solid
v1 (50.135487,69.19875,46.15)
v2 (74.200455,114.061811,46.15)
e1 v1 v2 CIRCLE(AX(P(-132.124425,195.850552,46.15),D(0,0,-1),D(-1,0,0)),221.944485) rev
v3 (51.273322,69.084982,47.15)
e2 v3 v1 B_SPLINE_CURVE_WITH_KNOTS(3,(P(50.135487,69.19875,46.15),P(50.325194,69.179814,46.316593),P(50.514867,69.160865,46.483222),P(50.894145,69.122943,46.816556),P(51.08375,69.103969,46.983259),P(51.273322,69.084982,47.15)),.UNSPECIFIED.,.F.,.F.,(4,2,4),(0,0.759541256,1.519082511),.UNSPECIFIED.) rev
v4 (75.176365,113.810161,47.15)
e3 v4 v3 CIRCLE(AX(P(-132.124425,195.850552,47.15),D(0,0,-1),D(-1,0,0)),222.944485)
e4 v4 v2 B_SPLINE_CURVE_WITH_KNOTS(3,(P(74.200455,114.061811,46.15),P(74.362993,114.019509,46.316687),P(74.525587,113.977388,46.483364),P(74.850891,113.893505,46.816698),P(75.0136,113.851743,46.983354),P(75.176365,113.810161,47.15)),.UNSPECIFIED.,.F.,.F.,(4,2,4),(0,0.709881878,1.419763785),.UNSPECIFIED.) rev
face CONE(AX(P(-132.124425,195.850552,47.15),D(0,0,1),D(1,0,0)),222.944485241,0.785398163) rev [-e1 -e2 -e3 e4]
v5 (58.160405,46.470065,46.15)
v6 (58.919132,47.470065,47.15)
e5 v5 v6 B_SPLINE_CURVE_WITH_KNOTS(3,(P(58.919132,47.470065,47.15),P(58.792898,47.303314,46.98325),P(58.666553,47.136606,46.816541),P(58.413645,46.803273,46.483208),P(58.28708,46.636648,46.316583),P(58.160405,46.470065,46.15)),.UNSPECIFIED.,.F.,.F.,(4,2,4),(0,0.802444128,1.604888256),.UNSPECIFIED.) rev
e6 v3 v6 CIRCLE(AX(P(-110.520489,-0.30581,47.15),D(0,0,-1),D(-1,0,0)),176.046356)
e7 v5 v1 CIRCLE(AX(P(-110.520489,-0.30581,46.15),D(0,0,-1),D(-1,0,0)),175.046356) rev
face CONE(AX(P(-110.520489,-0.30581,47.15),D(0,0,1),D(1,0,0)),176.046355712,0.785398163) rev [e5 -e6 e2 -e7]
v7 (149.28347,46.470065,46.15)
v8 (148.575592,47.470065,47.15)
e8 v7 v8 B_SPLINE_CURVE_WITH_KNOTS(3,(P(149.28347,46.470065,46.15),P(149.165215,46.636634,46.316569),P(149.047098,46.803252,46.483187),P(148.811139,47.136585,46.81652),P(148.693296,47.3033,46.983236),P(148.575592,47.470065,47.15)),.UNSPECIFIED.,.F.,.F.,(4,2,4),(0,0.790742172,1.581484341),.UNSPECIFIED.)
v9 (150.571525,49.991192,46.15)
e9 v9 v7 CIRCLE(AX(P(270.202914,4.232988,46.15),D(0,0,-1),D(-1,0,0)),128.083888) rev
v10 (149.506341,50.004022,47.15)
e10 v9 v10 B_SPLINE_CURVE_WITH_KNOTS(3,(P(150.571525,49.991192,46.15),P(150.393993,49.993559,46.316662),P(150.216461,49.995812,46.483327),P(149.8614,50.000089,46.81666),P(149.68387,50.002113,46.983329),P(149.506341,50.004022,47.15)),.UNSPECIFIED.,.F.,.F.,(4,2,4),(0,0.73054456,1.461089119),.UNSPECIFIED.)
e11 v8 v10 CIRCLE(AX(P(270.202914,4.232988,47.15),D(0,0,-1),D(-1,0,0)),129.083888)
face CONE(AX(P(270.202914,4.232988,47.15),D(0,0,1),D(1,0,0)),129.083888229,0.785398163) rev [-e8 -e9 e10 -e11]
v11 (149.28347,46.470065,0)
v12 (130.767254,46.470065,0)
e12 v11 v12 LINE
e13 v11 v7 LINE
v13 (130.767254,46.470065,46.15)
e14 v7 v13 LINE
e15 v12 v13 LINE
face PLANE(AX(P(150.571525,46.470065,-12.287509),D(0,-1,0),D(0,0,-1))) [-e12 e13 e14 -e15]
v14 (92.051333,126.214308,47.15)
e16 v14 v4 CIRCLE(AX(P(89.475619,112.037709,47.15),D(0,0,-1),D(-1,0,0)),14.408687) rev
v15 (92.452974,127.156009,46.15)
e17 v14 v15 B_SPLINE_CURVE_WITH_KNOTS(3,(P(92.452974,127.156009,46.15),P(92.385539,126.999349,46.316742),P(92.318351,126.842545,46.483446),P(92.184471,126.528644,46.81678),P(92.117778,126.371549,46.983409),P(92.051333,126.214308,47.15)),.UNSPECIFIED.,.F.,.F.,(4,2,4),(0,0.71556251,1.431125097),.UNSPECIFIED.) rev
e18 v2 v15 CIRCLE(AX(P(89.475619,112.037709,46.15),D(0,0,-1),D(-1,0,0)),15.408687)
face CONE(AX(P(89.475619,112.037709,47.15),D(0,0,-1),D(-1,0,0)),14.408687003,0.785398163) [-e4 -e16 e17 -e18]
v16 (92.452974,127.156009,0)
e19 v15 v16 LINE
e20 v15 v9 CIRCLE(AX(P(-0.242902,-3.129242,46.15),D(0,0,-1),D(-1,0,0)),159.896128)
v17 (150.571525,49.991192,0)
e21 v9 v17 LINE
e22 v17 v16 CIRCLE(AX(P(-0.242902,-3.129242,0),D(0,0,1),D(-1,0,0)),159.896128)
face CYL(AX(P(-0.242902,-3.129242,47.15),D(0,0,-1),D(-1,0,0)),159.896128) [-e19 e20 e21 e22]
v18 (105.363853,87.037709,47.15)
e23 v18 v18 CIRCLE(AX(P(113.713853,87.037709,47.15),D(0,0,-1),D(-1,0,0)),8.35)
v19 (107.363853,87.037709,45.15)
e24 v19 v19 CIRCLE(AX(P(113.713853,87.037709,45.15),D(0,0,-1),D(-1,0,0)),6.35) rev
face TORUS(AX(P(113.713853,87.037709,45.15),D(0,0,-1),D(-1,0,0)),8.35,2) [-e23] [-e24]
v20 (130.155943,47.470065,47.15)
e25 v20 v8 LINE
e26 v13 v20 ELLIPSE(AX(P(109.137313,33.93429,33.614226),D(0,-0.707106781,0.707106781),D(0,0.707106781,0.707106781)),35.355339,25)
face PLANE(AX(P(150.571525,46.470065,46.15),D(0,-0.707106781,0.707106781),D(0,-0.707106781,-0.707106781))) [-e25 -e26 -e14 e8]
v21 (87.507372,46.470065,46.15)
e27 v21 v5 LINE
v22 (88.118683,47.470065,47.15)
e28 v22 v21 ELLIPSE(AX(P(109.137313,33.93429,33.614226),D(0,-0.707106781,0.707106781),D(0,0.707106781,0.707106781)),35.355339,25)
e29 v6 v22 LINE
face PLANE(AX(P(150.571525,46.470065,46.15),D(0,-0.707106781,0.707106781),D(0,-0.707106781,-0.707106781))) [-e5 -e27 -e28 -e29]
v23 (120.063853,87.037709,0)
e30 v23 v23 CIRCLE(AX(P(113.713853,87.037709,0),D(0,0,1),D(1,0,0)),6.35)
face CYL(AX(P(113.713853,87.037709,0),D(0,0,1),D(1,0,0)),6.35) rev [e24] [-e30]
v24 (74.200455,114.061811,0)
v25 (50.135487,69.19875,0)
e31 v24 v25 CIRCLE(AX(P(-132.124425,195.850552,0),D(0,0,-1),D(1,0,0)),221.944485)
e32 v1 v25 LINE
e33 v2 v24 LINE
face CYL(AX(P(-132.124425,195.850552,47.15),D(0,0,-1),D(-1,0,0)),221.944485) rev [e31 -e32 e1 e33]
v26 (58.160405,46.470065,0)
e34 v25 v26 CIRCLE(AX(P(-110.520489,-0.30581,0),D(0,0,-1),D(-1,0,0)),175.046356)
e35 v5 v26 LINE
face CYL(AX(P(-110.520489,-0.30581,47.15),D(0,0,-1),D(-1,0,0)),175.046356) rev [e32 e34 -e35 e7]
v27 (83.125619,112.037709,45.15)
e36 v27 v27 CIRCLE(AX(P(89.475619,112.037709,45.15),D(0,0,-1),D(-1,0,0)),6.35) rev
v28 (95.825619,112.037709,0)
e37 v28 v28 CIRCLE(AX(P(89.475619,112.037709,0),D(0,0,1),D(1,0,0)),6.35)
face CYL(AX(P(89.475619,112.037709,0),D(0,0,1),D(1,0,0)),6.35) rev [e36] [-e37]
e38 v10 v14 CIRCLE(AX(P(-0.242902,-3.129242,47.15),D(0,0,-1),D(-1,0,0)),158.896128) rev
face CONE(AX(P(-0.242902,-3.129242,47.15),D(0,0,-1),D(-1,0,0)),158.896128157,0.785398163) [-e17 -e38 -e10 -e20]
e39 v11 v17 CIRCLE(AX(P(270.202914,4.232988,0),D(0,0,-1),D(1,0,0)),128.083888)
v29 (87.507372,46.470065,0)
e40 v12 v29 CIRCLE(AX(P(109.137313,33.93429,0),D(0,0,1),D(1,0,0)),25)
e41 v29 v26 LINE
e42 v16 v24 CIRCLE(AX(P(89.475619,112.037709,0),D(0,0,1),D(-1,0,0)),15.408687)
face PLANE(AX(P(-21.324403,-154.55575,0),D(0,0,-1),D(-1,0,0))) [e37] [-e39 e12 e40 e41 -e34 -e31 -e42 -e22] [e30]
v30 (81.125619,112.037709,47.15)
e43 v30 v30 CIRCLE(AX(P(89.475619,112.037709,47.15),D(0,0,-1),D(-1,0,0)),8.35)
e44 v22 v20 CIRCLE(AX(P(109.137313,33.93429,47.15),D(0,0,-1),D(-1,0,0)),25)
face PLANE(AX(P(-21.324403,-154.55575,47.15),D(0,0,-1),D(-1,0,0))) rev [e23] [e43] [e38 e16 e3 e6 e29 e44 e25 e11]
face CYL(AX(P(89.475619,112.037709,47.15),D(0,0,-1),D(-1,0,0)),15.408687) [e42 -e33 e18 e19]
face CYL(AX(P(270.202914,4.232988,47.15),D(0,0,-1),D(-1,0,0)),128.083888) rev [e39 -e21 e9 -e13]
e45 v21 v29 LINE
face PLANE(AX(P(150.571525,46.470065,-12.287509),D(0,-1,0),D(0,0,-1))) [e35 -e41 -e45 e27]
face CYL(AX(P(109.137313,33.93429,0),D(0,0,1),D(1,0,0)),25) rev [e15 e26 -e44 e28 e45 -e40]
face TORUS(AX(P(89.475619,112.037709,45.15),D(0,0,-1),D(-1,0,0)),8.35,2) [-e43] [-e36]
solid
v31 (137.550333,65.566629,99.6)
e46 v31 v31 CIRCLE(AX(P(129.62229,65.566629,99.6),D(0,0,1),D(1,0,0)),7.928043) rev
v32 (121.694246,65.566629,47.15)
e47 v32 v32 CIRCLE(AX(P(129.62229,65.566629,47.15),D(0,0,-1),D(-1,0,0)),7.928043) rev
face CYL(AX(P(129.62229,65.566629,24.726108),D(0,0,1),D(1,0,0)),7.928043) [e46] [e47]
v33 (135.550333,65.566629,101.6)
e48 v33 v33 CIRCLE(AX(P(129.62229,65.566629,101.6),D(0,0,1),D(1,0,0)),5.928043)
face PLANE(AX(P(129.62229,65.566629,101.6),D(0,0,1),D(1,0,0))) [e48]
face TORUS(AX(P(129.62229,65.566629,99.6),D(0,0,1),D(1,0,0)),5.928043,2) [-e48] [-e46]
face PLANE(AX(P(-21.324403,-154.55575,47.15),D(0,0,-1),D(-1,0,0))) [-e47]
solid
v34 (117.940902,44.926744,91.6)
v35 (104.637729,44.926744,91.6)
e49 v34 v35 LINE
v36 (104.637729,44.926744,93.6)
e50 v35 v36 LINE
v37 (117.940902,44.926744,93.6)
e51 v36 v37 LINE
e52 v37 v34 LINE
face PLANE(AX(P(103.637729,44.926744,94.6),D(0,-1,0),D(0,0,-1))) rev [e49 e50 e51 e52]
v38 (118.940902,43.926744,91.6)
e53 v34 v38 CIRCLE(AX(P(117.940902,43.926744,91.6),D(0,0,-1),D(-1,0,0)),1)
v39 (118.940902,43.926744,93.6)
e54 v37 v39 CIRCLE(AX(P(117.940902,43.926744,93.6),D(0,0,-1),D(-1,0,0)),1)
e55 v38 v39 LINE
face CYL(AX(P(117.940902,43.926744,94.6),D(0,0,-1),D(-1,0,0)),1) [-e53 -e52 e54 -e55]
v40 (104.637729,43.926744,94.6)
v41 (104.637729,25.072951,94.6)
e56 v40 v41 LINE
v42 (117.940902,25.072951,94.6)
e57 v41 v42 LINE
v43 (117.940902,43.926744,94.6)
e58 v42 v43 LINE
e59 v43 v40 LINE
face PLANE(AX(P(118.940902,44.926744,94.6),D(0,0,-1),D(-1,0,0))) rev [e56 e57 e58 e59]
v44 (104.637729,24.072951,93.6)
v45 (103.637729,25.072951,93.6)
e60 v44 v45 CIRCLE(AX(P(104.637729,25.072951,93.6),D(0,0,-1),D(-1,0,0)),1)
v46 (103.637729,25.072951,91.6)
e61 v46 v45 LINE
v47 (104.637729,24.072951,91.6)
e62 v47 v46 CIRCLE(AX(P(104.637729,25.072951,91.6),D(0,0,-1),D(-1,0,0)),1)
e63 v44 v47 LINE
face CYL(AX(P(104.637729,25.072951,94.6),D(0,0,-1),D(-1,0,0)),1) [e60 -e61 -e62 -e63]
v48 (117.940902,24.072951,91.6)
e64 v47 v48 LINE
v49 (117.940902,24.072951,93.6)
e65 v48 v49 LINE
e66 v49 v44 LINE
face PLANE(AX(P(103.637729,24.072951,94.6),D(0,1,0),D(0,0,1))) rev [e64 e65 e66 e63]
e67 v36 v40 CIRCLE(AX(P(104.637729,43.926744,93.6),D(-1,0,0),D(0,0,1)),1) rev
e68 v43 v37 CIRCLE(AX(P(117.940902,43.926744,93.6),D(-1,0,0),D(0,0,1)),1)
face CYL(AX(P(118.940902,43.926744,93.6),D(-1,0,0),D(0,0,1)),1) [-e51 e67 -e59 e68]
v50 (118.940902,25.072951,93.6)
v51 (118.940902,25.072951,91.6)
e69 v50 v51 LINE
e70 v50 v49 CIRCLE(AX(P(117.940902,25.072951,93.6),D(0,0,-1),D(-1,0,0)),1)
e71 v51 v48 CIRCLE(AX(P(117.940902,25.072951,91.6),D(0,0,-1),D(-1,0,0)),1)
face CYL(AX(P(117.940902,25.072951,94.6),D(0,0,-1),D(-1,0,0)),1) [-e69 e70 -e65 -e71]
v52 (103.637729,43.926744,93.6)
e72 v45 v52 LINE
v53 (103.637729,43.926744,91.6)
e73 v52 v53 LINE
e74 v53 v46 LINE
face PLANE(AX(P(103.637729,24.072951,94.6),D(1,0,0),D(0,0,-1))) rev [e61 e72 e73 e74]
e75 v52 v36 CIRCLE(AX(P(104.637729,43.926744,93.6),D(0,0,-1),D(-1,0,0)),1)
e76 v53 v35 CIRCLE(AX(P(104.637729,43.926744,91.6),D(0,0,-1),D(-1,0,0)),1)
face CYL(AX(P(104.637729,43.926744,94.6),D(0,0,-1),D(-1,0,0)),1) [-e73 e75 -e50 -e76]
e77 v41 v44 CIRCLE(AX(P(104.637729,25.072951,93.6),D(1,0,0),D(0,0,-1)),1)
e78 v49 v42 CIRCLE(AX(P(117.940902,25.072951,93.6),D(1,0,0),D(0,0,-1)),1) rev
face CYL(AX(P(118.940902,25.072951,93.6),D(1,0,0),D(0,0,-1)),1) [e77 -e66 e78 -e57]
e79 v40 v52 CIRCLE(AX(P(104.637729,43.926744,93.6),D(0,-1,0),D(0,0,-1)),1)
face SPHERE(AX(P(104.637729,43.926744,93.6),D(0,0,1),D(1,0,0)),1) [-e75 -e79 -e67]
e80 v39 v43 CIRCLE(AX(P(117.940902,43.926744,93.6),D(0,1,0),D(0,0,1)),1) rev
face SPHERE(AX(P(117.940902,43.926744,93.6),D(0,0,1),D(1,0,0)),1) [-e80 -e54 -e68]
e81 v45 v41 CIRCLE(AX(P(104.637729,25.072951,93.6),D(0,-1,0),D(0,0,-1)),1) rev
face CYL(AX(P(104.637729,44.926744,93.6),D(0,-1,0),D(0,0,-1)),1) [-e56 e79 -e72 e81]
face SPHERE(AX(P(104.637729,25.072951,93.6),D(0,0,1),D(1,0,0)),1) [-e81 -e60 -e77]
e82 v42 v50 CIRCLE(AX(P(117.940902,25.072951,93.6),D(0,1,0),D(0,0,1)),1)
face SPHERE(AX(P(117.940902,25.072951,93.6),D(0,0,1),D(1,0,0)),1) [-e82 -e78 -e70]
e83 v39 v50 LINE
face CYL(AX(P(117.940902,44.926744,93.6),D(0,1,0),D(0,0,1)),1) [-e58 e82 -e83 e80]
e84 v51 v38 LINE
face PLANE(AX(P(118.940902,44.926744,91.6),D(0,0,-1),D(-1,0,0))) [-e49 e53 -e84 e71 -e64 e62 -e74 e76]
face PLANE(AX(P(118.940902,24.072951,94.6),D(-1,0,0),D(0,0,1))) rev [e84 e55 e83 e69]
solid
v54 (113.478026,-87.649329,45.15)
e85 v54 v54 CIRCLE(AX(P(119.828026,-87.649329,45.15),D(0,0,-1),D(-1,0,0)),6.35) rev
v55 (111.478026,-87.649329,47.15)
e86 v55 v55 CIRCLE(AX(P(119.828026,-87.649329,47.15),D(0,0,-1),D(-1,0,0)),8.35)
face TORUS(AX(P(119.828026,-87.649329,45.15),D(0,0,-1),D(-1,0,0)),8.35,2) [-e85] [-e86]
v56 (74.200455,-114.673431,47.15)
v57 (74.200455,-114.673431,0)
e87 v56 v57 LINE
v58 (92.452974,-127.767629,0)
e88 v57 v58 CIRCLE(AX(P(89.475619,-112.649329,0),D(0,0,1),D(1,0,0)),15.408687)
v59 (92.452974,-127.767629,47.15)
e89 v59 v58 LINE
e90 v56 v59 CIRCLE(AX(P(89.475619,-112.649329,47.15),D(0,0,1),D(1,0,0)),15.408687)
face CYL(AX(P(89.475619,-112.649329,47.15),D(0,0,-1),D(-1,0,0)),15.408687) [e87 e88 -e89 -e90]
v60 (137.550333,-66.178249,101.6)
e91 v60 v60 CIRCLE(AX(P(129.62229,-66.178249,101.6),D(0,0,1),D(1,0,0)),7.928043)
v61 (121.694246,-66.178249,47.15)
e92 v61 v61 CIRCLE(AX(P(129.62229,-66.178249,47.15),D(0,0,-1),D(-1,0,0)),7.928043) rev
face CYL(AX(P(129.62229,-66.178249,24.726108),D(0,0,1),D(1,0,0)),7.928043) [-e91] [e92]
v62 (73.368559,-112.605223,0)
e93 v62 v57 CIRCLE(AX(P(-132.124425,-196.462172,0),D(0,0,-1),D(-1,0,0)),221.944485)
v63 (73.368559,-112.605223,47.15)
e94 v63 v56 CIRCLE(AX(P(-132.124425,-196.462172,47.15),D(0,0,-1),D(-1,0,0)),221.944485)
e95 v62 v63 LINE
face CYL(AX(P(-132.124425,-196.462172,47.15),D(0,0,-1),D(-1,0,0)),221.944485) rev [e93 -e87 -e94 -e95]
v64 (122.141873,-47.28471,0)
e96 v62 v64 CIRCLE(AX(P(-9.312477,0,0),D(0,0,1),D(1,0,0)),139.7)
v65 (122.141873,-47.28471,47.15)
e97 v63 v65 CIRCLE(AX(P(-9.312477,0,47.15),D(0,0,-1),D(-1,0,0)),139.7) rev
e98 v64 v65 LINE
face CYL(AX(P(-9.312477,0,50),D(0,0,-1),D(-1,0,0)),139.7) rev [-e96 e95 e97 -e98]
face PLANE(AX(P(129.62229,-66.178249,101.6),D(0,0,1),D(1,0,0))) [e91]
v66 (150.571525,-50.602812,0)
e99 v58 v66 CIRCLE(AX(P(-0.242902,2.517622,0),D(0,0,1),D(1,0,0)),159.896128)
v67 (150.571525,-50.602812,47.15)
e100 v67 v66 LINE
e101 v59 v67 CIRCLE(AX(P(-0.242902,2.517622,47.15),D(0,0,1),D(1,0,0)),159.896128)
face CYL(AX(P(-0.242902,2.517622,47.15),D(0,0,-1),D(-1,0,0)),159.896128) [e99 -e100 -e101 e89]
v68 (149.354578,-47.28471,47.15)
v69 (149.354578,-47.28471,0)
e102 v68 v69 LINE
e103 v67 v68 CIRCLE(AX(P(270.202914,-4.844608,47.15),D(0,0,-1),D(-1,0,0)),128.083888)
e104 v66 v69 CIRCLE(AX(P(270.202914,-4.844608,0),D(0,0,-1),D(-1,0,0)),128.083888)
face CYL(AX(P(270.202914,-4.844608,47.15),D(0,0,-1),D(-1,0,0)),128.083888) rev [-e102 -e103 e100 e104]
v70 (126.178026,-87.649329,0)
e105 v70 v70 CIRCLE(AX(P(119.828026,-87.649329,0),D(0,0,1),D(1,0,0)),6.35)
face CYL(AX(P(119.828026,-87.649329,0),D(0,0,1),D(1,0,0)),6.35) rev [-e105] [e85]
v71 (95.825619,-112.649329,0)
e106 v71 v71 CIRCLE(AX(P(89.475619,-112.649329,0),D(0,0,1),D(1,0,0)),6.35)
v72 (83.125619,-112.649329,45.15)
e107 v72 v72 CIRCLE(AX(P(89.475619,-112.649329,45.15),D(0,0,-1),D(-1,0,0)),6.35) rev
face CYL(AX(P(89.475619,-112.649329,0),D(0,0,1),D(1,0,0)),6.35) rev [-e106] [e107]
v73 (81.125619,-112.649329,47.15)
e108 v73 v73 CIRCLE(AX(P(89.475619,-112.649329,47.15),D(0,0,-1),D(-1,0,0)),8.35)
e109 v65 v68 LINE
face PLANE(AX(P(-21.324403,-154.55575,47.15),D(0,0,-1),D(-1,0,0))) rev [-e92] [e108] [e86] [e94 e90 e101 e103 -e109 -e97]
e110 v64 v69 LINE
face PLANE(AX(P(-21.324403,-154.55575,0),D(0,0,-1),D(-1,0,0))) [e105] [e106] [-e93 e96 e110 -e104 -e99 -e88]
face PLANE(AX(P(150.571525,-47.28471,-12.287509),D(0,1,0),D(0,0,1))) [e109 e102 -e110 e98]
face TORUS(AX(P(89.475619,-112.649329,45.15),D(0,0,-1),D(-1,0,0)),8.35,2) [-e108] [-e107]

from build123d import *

# Parameters (mm, degrees)
EXTRUDE1_DEPTH      = 47.15
SKETCH6_R           = 6.35
CUT_EXTRUDE1_DEPTH  = 204.208666026
FILLET2_R           = 2
FILLET4_R           = 2
SKETCH8_W           = 65.70292375
SKETCH8_H           = 93.754774622
CUT_EXTRUDE3_DEPTH  = 204.208666026
CHAMFER2_SIZE       = 1
SKETCH9_R           = 139.7
CUT_EXTRUDE4_DEPTH  = 50
SKETCH11_R          = 25
CUT_EXTRUDE6_DEPTH  = 214.843866987
EXTRUDE3_DEPTH      = 20
EXTRUDE3_DEPTH_BACK = 34.45
SKETCH13_R          = 7.928043211
FILLET5_R           = 2
SKETCH14_W          = 15.303172184
SKETCH14_H          = 20.853792668
EXTRUDE4_DEPTH      = 3
FILLET7_R           = 1
FILLET8_R           = 1


with BuildPart() as part:
    # Sketch3 → Extrude1 (new body)
    with BuildSketch(Plane.XY):
        with BuildLine():
            ThreePointArc((50.135487095, 69.198750466), (64.525866494, -0.305809979), (50.135487095, -69.810370425))
            ThreePointArc((50.135487095, -69.810370425), (63.45857204, -91.549610055), (74.200455137, -114.673430667))
            ThreePointArc((74.200455137, -114.673430667), (80.493774475, -125.169476107), (92.452973513, -127.767628632))
            ThreePointArc((92.452973513, -127.767628632), (127.479136393, -93.679325746), (150.571524888, -50.602811572))
            ThreePointArc((150.571524888, -50.602811572), (143.857356878, -25.875125735), (142.199469451, -0.305809979))
            ThreePointArc((142.199469451, -0.305809979), (143.857356878, 25.263505776), (150.571524888, 49.991191613))
            ThreePointArc((150.571524888, 49.991191613), (127.479136393, 93.067705787), (92.452973513, 127.156008673))
            ThreePointArc((92.452973513, 127.156008673), (80.493774475, 124.557856149), (74.200455137, 114.061810708))
            ThreePointArc((74.200455137, 114.061810708), (63.45857204, 90.937990097), (50.135487095, 69.198750466))
        make_face()
    extrude(amount=EXTRUDE1_DEPTH)

    # Sketch6 → Cut-Extrude1 (cut, through all)
    with BuildSketch(Plane.XY.offset(47.15)):
        with Locations((89.47561948, 112.037708566)):
            Circle(SKETCH6_R)
        with Locations((89.47561948, -112.649328525)):
            Circle(SKETCH6_R)
        with Locations((113.713853194, 87.037708566)):
            Circle(SKETCH6_R)
        with Locations((119.828025898, -87.649328525)):
            Circle(SKETCH6_R)
    extrude(amount=-CUT_EXTRUDE1_DEPTH, mode=Mode.SUBTRACT)

    # Fillet2
    fillet2_edges = [part.edges().sort_by_distance(p)[0] for p in [
        (113.478025898, -87.649328525, 47.15),
    ]]
    fillet(fillet2_edges, radius=FILLET2_R)

    # Fillet4
    fillet4_edges = [part.edges().sort_by_distance(p)[0] for p in [
        (83.12561948, 112.037708566, 47.15),
        (83.12561948, -112.649328525, 47.15),
        (107.363853194, 87.037708566, 47.15),
    ]]
    fillet(fillet4_edges, radius=FILLET4_R)

    # Sketch8 → Cut-Extrude3 (cut, through all)
    with BuildSketch(Plane(origin=(0, 0, 0), x_dir=(0, 0, -1), z_dir=(1, 0, 0))):
        with Locations((-20.563952962, -0.407322691)):
            Rectangle(SKETCH8_W, SKETCH8_H)
    extrude(amount=CUT_EXTRUDE3_DEPTH, mode=Mode.SUBTRACT)


with BuildPart() as cut_extrude3_piece_1:
    # of the separate pieces the step leaves, piece 1, a body of its own (cut_extrude3_pieces)
    add(part.part.solids().sort_by_distance((74.200455137, 114.061810708, 47.15))[0])

    # Chamfer2
    chamfer2_edges = [cut_extrude3_piece_1.edges().sort_by_distance(p)[0] for p in [
        (63.45857204, 90.937990097, 47.15),
    ]]
    chamfer(chamfer2_edges, length=CHAMFER2_SIZE)
    chamfer2_2_edges = [cut_extrude3_piece_1.edges().sort_by_distance(p)[0] for p in [
        (80.493774475, 124.557856149, 47.15),
    ]]
    chamfer(chamfer2_2_edges, length=CHAMFER2_SIZE)
    chamfer2_3_edges = [cut_extrude3_piece_1.edges().sort_by_distance(p)[0] for p in [
        (128.375850758, 91.865433078, 47.15),
    ]]
    chamfer(chamfer2_3_edges, length=CHAMFER2_SIZE)
    chamfer2_4_edges = [cut_extrude3_piece_1.edges().sort_by_distance(p)[0] for p in [
        (149.648335334, 47.500481851, 47.15),
    ]]
    chamfer(chamfer2_4_edges, length=CHAMFER2_SIZE)
    chamfer2_5_edges = [cut_extrude3_piece_1.edges().sort_by_distance(p)[0] for p in [
        (103.192563129, 46.47006462, 47.15),
    ]]
    chamfer(chamfer2_5_edges, length=CHAMFER2_SIZE)
    chamfer2_6_edges = [cut_extrude3_piece_1.edges().sort_by_distance(p)[0] for p in [
        (54.562850398, 57.906883046, 47.15),
    ]]
    chamfer(chamfer2_6_edges, length=CHAMFER2_SIZE)

    # Sketch11 → Cut-Extrude6 (cut, through all)
    with BuildSketch(Plane.XY.offset(81.6)):
        with Locations((109.137313189, 33.934290249)):
            Circle(SKETCH11_R)
    extrude(amount=-CUT_EXTRUDE6_DEPTH, mode=Mode.SUBTRACT)


with BuildPart() as cut_extrude3_piece_2:
    # of the separate pieces the step leaves, piece 2, a body of its own (cut_extrude3_pieces)
    add(part.part.solids().sort_by_distance((149.354578468, -47.284710002, 47.15))[0])

    # Sketch9 → Cut-Extrude4 (cut)
    with BuildSketch(Plane.XY):
        with Locations((-9.312477076, 0)):
            Circle(SKETCH9_R)
    extrude(amount=CUT_EXTRUDE4_DEPTH, mode=Mode.SUBTRACT)

    # Sketch13 → Extrude3 (add, two sides: drawn at the far end of the back side and taken through both)
    with BuildSketch(Plane.XY.offset(81.6).offset(-EXTRUDE3_DEPTH_BACK)):
        with Locations((129.622289656, 65.566628934)):
            Circle(SKETCH13_R)
        with Locations((129.622289656, -66.178248893)):
            Circle(SKETCH13_R)
    extrude(amount=EXTRUDE3_DEPTH + EXTRUDE3_DEPTH_BACK)


with BuildPart() as extrude3_piece_1:
    # of the separate pieces the step leaves, piece 1, a body of its own (extrude3_pieces)
    add(cut_extrude3_piece_2.part.solids().sort_by_distance((150.571524888, -50.602811572, 47.15))[0])


with BuildPart() as extrude3_piece_2:
    # of the separate pieces the step leaves, piece 2, a body of its own (extrude3_pieces)
    add(cut_extrude3_piece_2.part.solids().sort_by_distance((137.550332867, 65.566628934, 81.6))[0])

    # Fillet5
    fillet5_edges = [extrude3_piece_2.edges().sort_by_distance(p)[0] for p in [
        (121.694246445, 65.566628934, 101.6),
    ]]
    fillet(fillet5_edges, radius=FILLET5_R)


with BuildPart() as body_4:
    # Sketch14 → Extrude4 (new body)
    with BuildSketch(Plane.XY.offset(91.6)):
        with Locations((111.289315561, 34.499847247)):
            Rectangle(SKETCH14_W, SKETCH14_H)
    extrude(amount=EXTRUDE4_DEPTH)

    # Fillet7
    fillet7_edges = [body_4.edges().sort_by_distance(p)[0] for p in [
        (103.637729469, 34.499847247, 94.6),
        (111.289315561, 24.072950913, 94.6),
        (118.940901653, 34.499847247, 94.6),
        (111.289315561, 44.926743581, 94.6),
    ]]
    fillet(fillet7_edges, radius=FILLET7_R)

    # Fillet8
    # the kernel refuses this fillet: 1 mm, written as the material it takes off along each edge
    with BuildSketch(Plane(origin=(104.637729469, 43.926743581, 93.6), x_dir=(0, 1, 0), z_dir=(-1, 0, 0))) as fillet8_piece_1_section:
        Polygon((0, 0), (FILLET8_R, 0), (FILLET8_R, -FILLET8_R), (0, -FILLET8_R), align=None)
    fillet8_piece_1 = extrude(amount=FILLET8_R, mode=Mode.PRIVATE)
    fillet8_piece_1 = fillet8_piece_1 - Plane(origin=(104.637729469, 43.926743581, 93.6), x_dir=(0, -0.7071067811865475, -0.7071067811865475), z_dir=(-1, 0, 0)) * Sphere(FILLET8_R, mode=Mode.PRIVATE)
    add(fillet8_piece_1, mode=Mode.SUBTRACT)
    with BuildSketch(Plane(origin=(117.940901653, 43.926743581, 93.6), x_dir=(0, 1, 0), z_dir=(1, 0, 0))) as fillet8_piece_2_section:
        Polygon((0, 0), (FILLET8_R, 0), (FILLET8_R, FILLET8_R), (0, FILLET8_R), align=None)
    fillet8_piece_2 = extrude(amount=FILLET8_R, mode=Mode.PRIVATE)
    fillet8_piece_2 = fillet8_piece_2 - Plane(origin=(117.940901653, 43.926743581, 93.6), x_dir=(0, -0.7071067811865475, -0.7071067811865475), z_dir=(1, 0, 0)) * Sphere(FILLET8_R, mode=Mode.PRIVATE)
    add(fillet8_piece_2, mode=Mode.SUBTRACT)
    with BuildSketch(Plane(origin=(104.637729469, 25.072950913, 93.6), x_dir=(-1, 0, 0), z_dir=(0, -1, 0))) as fillet8_piece_3_section:
        Polygon((0, 0), (FILLET8_R, 0), (FILLET8_R, -FILLET8_R), (0, -FILLET8_R), align=None)
    fillet8_piece_3 = extrude(amount=FILLET8_R, mode=Mode.PRIVATE)
    fillet8_piece_3 = fillet8_piece_3 - Plane(origin=(104.637729469, 25.072950913, 93.6), x_dir=(0.7071067811865475, 0, -0.7071067811865475), z_dir=(0, -1, 0)) * Sphere(FILLET8_R, mode=Mode.PRIVATE)
    add(fillet8_piece_3, mode=Mode.SUBTRACT)
    with BuildSketch(Plane(origin=(117.940901653, 25.072950913, 93.6), x_dir=(1, 0, 0), z_dir=(0, -1, 0))) as fillet8_piece_4_section:
        Polygon((0, 0), (FILLET8_R, 0), (FILLET8_R, FILLET8_R), (0, FILLET8_R), align=None)
    fillet8_piece_4 = extrude(amount=FILLET8_R, mode=Mode.PRIVATE)
    fillet8_piece_4 = fillet8_piece_4 - Plane(origin=(117.940901653, 25.072950913, 93.6), x_dir=(-0.7071067811865475, 0, -0.7071067811865475), z_dir=(0, -1, 0)) * Sphere(FILLET8_R, mode=Mode.PRIVATE)
    add(fillet8_piece_4, mode=Mode.SUBTRACT)
    with BuildSketch(Plane(origin=(118.940901653, 24.072950913, 89.1), x_dir=(-1, 0, 0), z_dir=(0, 0, 1)), Plane(origin=(118.940901653, 44.926743581, 89.1), x_dir=(0, -1, 0), z_dir=(0, 0, 1))) as fillet8_piece_5:
        with BuildLine():
            CenterArc((FILLET8_R, -FILLET8_R), FILLET8_R, 90, 90)
            Line((0, -FILLET8_R), (0, 0))
            Line((0, 0), (FILLET8_R, 0))
        make_face()
    extrude(amount=4.5, mode=Mode.SUBTRACT)
    with BuildSketch(Plane(origin=(103.637729469, 24.072950913, 89.1), x_dir=(1, 0, 0), z_dir=(0, 0, 1)), Plane(origin=(103.637729469, 44.926743581, 89.1), x_dir=(0, -1, 0), z_dir=(0, 0, 1))) as fillet8_piece_6:
        with BuildLine():
            CenterArc((FILLET8_R, FILLET8_R), FILLET8_R, 180, 90)
            Line((0, FILLET8_R), (0, 0))
            Line((0, 0), (FILLET8_R, 0))
        make_face()
    extrude(amount=4.5, mode=Mode.SUBTRACT)


solid = Compound([cut_extrude3_piece_1.part, extrude3_piece_1.part, extrude3_piece_2.part, body_4.part])
